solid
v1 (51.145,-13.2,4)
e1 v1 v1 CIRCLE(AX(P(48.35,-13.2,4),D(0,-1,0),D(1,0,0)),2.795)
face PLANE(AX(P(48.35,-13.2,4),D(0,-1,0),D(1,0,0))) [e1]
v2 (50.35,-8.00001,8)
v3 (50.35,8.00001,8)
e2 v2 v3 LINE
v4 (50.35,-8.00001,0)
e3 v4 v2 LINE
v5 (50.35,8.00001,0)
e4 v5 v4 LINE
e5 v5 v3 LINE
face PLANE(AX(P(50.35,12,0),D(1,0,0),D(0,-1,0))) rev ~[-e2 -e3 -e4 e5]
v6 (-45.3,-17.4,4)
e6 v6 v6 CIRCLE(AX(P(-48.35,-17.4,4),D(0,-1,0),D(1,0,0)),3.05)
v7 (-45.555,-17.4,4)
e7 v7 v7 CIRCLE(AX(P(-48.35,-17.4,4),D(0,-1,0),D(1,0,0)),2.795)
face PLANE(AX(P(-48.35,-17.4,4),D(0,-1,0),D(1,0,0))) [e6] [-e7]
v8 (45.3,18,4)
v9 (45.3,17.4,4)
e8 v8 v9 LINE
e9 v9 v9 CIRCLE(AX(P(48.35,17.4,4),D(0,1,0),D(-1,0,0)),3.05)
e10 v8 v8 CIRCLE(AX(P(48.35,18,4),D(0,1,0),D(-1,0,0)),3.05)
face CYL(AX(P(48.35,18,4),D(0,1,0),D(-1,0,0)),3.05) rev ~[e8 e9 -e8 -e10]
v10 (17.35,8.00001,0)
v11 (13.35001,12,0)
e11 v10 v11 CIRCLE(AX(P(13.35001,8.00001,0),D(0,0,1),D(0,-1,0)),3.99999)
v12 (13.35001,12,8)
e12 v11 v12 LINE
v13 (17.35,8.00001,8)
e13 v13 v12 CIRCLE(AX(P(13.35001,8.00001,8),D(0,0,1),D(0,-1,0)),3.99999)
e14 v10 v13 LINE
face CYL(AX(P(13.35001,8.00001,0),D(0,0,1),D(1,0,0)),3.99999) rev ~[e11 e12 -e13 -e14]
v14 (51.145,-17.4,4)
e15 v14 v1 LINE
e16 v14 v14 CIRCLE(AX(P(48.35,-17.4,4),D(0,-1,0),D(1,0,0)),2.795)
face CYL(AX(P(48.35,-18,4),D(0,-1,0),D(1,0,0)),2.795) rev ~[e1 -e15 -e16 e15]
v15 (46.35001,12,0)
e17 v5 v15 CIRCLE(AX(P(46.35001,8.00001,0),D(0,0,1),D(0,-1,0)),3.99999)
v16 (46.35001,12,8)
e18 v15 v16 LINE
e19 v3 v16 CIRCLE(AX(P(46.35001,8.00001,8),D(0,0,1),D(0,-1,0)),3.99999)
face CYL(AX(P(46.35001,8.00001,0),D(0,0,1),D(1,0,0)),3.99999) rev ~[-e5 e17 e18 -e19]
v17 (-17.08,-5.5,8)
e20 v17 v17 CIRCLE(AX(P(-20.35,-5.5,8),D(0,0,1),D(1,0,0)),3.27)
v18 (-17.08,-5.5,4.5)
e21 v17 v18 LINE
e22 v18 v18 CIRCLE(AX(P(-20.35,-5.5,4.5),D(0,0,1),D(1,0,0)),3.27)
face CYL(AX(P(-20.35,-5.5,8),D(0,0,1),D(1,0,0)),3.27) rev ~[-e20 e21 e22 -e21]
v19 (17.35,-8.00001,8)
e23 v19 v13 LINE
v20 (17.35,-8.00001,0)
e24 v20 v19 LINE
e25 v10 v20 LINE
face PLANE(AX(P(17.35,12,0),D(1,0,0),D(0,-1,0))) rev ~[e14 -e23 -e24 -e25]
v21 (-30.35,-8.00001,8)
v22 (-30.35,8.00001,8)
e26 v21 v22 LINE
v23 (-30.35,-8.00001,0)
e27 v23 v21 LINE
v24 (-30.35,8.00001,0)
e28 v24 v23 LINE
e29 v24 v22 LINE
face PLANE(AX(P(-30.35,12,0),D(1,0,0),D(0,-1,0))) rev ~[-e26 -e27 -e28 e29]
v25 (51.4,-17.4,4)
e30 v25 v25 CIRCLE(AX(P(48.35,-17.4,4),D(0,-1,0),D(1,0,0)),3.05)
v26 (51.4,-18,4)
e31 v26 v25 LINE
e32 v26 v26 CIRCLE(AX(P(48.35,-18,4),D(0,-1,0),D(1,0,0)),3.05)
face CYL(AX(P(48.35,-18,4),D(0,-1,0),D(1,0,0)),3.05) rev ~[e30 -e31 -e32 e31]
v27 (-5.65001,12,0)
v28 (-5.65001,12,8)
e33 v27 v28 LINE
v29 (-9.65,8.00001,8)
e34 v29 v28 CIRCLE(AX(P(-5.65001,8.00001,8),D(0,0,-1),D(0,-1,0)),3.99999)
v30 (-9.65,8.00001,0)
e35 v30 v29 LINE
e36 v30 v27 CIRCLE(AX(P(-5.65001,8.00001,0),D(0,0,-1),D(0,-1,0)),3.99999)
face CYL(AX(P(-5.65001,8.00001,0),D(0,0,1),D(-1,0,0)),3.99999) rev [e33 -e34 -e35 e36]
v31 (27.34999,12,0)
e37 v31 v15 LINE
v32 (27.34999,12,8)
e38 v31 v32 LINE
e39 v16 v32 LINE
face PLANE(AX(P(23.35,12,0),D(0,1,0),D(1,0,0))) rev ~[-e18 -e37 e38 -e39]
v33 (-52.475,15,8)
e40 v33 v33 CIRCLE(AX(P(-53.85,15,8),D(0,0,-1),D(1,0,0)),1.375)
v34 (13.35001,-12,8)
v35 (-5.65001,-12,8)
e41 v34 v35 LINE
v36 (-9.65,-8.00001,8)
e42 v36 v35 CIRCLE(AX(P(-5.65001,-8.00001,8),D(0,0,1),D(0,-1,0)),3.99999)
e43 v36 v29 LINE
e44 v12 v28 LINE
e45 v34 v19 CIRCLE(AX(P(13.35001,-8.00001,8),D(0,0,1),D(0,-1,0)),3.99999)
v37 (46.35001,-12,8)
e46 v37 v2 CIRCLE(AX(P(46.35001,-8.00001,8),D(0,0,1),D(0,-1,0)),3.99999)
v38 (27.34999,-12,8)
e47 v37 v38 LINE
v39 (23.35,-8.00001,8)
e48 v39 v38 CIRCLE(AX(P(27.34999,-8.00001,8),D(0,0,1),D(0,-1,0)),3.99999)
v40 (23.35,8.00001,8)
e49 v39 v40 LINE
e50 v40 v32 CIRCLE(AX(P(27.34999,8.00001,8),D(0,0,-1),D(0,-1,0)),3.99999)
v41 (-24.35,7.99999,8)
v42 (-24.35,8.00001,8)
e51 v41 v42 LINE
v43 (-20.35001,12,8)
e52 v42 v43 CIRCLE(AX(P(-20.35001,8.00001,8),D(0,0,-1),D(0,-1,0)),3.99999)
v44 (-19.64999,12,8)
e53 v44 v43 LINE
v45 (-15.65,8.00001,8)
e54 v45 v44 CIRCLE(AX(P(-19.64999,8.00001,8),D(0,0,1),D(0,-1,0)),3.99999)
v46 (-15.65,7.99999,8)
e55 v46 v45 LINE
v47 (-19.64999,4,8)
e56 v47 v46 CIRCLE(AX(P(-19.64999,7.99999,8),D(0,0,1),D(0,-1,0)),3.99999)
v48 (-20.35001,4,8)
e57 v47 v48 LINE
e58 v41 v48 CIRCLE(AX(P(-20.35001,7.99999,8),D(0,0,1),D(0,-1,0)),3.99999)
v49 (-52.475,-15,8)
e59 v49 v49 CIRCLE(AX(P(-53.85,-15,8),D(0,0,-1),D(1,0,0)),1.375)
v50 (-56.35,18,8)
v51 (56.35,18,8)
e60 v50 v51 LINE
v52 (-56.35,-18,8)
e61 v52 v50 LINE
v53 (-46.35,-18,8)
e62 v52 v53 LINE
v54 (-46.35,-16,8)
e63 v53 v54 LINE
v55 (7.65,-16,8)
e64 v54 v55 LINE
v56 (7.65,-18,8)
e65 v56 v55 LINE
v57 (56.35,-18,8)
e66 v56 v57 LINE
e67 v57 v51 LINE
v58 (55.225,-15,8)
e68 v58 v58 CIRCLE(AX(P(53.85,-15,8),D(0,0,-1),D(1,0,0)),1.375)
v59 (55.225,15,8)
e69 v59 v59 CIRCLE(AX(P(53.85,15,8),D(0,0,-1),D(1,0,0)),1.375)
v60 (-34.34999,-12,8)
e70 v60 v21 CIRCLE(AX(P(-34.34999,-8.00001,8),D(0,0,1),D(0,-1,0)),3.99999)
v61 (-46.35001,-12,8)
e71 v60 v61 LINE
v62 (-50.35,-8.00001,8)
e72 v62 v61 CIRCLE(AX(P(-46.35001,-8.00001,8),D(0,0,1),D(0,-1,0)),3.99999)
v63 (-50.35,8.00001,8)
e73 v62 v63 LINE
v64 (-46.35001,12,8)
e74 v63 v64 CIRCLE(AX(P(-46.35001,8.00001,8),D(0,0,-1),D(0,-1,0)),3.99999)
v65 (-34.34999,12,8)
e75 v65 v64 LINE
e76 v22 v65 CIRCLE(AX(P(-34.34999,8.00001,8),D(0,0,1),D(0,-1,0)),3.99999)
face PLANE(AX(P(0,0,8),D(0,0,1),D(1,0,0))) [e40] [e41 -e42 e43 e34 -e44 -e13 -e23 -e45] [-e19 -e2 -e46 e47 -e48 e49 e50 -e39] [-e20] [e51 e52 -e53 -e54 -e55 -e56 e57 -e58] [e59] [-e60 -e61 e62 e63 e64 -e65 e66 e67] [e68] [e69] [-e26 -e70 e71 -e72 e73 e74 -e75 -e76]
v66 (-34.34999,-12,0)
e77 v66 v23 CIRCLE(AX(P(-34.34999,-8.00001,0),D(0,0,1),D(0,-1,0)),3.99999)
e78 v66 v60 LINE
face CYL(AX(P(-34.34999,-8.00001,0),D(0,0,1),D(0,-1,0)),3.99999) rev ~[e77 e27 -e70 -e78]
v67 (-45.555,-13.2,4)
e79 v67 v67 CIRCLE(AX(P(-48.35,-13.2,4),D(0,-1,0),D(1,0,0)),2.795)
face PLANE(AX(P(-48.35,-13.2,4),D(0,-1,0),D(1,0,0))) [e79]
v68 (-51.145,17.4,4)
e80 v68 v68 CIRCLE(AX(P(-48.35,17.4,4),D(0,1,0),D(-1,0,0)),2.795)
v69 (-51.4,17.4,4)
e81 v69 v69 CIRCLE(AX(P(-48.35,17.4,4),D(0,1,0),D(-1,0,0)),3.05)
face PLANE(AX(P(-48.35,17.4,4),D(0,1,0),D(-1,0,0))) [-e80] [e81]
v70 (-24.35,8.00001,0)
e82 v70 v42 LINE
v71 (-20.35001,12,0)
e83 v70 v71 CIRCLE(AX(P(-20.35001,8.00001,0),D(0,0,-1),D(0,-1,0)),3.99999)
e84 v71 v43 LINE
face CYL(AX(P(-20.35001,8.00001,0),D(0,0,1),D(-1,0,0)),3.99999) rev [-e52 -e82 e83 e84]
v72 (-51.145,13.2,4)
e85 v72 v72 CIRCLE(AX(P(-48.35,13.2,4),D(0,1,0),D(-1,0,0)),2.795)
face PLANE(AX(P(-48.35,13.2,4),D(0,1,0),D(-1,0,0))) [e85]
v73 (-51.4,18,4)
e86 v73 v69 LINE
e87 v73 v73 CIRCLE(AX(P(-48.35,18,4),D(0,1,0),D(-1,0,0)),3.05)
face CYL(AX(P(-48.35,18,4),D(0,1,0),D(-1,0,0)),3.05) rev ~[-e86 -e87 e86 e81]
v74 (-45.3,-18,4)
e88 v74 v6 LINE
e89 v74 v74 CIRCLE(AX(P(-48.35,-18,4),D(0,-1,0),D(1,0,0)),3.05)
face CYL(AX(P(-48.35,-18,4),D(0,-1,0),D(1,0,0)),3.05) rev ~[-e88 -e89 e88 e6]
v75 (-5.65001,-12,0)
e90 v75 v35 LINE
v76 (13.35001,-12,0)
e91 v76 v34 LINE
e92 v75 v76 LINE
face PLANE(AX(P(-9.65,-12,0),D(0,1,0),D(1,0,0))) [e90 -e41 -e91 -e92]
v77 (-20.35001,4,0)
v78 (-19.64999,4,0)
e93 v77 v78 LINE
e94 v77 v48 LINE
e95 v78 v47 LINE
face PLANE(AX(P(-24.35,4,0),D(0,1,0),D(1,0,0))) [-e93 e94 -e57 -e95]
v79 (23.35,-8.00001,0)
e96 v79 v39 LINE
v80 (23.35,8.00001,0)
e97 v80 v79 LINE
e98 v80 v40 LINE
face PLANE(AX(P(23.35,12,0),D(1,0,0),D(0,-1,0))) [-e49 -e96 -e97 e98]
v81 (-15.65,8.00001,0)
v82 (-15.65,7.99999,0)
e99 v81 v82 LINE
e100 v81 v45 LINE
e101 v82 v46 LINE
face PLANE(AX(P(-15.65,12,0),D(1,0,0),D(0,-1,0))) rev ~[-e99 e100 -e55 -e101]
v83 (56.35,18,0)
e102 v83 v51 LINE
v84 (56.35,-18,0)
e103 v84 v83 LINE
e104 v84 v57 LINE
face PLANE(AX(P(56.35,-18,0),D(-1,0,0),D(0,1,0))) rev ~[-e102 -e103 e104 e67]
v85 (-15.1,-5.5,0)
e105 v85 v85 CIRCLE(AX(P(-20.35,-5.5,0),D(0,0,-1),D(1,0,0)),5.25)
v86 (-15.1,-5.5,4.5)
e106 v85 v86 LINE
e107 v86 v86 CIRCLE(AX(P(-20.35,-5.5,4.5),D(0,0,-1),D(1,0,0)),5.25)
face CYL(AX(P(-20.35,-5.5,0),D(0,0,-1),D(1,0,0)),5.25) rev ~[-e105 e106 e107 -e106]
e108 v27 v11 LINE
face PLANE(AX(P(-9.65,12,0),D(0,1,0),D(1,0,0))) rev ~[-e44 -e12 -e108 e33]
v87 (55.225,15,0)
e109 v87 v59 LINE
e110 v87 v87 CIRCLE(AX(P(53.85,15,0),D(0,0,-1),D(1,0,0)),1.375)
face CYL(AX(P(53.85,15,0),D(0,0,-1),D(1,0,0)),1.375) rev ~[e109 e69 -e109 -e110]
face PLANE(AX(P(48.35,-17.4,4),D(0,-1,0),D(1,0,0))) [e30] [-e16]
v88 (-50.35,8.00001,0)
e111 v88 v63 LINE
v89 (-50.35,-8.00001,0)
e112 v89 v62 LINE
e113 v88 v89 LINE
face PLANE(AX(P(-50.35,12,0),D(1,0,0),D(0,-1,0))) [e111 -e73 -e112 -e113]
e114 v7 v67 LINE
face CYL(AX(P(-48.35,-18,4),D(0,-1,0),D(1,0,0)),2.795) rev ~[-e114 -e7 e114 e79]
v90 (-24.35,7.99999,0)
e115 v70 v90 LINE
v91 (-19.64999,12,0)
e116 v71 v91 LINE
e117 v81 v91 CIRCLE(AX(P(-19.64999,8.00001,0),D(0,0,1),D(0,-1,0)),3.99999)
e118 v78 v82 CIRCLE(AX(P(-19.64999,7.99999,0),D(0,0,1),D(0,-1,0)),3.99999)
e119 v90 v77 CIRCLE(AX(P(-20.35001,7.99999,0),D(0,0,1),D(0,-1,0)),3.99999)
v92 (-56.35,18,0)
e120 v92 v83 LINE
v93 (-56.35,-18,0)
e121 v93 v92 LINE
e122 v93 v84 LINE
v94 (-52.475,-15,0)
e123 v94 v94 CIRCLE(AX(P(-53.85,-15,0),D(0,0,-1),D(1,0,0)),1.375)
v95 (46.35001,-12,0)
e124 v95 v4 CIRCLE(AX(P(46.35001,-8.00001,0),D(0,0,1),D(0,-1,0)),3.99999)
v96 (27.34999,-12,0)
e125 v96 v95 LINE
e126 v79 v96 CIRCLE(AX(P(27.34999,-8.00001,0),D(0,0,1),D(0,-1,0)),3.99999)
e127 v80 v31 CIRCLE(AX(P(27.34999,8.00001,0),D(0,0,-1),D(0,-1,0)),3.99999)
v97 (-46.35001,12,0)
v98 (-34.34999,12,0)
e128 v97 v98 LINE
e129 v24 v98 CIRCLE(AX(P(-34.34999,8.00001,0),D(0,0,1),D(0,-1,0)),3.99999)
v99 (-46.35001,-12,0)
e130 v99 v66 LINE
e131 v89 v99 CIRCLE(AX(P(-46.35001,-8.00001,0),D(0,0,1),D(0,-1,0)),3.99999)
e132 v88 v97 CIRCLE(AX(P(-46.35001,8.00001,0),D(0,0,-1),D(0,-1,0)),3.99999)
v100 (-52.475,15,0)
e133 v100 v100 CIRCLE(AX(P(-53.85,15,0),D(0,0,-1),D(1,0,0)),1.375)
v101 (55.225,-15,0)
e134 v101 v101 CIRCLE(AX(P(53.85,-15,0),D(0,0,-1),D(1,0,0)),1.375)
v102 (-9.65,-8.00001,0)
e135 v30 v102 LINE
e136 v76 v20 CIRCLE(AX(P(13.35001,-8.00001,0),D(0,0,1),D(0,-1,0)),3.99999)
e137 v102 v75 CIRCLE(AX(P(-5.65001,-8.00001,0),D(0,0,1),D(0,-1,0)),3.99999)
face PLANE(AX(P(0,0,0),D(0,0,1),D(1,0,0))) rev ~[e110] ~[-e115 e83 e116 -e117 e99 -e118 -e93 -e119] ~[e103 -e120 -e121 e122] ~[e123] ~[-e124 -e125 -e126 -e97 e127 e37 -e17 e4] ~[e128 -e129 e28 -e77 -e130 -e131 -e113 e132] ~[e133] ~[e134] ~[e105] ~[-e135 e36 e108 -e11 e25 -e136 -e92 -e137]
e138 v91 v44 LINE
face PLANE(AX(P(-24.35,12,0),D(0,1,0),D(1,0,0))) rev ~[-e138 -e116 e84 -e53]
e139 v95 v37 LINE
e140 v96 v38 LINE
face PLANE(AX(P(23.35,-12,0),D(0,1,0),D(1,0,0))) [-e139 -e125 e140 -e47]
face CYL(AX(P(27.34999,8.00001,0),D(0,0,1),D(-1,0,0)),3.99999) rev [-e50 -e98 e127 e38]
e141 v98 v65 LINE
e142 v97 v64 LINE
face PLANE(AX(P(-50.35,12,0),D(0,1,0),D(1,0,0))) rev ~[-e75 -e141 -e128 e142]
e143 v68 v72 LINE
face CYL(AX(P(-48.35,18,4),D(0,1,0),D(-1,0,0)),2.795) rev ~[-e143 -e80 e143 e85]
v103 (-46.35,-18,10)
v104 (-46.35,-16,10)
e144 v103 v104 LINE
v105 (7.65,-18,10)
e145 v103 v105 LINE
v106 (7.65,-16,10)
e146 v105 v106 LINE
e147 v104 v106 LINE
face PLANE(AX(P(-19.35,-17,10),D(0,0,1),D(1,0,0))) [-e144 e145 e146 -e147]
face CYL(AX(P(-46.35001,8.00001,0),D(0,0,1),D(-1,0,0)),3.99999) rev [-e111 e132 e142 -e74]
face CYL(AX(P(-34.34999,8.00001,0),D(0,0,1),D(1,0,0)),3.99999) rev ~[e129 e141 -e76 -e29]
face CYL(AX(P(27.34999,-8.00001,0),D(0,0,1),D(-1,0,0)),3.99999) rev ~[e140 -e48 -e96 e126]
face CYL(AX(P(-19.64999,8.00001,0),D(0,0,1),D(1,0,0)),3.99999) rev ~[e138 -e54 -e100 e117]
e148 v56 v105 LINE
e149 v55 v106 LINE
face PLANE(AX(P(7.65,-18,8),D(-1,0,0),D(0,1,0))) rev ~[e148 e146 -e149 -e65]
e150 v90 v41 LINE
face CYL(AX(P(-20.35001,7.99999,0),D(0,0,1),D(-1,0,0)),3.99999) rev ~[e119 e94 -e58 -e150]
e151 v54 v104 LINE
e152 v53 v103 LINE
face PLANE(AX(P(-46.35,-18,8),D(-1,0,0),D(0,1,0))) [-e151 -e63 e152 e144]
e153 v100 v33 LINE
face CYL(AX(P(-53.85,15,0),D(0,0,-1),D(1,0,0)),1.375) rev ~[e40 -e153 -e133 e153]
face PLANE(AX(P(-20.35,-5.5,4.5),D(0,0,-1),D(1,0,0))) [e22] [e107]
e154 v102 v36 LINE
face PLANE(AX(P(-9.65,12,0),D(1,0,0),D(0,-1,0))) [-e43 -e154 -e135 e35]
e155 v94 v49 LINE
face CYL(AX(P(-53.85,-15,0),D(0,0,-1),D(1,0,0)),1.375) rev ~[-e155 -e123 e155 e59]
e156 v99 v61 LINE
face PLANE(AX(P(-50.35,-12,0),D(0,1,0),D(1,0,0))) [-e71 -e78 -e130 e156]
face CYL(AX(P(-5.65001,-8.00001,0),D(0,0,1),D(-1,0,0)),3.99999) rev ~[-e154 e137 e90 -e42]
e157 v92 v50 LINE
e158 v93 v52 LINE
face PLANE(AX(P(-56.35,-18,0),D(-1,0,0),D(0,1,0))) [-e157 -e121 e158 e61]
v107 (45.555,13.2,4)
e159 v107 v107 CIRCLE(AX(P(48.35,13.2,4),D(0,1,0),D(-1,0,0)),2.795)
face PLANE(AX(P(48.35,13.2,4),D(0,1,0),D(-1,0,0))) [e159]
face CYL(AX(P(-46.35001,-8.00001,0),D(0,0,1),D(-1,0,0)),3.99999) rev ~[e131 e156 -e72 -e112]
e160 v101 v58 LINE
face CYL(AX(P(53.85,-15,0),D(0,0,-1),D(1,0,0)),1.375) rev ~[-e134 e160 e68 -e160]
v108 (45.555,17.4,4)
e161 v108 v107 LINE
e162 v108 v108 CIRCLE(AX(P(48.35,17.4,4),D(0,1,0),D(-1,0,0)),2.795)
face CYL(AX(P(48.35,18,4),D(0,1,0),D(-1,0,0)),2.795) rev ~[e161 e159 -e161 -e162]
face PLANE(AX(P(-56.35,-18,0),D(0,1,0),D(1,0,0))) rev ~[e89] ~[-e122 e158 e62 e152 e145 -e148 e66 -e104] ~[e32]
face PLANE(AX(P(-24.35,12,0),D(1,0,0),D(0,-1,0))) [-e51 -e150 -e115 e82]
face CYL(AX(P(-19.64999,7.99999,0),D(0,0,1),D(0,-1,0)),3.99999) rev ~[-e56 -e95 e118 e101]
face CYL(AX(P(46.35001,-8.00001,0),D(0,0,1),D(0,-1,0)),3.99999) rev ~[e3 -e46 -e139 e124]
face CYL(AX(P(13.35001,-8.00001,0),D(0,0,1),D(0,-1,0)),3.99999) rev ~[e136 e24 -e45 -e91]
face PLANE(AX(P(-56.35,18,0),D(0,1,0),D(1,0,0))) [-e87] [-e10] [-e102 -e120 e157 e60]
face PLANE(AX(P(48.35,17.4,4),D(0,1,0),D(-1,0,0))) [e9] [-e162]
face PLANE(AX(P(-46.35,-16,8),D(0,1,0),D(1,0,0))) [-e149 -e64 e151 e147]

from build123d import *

# Parameters (mm, degrees)
F0_W      = 112.7
F0_H      = 36
F1_DEPTH  = 8
F3_W      = 54
F3_H      = 2
F4_DEPTH  = 2
F5_R      = 3.27
F6_DEPTH  = 8.001
F7_R      = 1.375
F8_DEPTH  = 10.001
F10_R     = 5.25
F11_DEPTH = 4.5
F9_W      = 20
F9_H      = 24
F9_W_2    = 27
F9_W_3    = 8.7
F9_H_2    = 8
F12_DEPTH = 10.001
F13_R     = 3.99999
F14_R     = 2.795
F15_DEPTH = 4.8
F16_R     = 2.795
F17_DEPTH = 4.8
F18_R     = 3.05
F19_DEPTH = 0.6
F20_R     = 3.05
F21_DEPTH = 0.6


# Not quite as in the source:
# - a fillet or chamfer is up to 0.001 mm smaller than in the source, because OpenCascade refuses the exact size


with BuildPart() as f1:
    # F0 (on Top) → F1 (new body)
    with BuildSketch(Plane.XY):
        Rectangle(F0_W, F0_H)
    extrude(amount=F1_DEPTH)

    # F3 (on face) → F4 (join)
    with BuildSketch(Plane.XY.offset(8)):
        with Locations((-19.35, -17)):
            Rectangle(F3_W, F3_H)
    extrude(amount=F4_DEPTH)

    # F5 (on face) → F6 (cut, through all)
    with BuildSketch(Plane.XY.offset(8)):
        with Locations((-20.35, -5.5)):
            Circle(F5_R)
    extrude(amount=-F6_DEPTH, mode=Mode.SUBTRACT)

    # F7 (on face) → F8 (cut, through all)
    with BuildSketch(Plane(origin=(0, 0, 0), x_dir=(1, 0, 0), z_dir=(0, 0, -1))):
        with Locations((-53.85, 15)):
            Circle(F7_R)
        with Locations((-53.85, -15)):
            Circle(F7_R)
        with Locations((53.85, 15)):
            Circle(F7_R)
        with Locations((53.85, -15)):
            Circle(F7_R)
    extrude(amount=-F8_DEPTH, mode=Mode.SUBTRACT)

    # F10 (on face) → F11 (cut)
    with BuildSketch(Plane(origin=(0, 0, 0), x_dir=(1, 0, 0), z_dir=(0, 0, -1))):
        with Locations((-20.35, 5.5)):
            Circle(F10_R)
    extrude(amount=-F11_DEPTH, mode=Mode.SUBTRACT)

    # F9 (on face) → F12 (cut, through all)
    with BuildSketch(Plane(origin=(0, 0, 0), x_dir=(1, 0, 0), z_dir=(0, 0, -1))):
        with Locations((-40.35, 0)):
            Rectangle(F9_W, F9_H)
        with Locations((3.85, 0)):
            Rectangle(F9_W_2, F9_H)
        with Locations((36.85, 0)):
            Rectangle(F9_W_2, F9_H)
        with Locations((-20, -8)):
            Rectangle(F9_W_3, F9_H_2)
    extrude(amount=-F12_DEPTH, mode=Mode.SUBTRACT)

    # F13 (radius 4 in the source; OpenCascade refuses exactly that, so slightly less here)
    f13_edges = [f1.edges().sort_by_distance(p)[0] for p in [
        (-30.35, -12, 4),
        (-50.35, -12, 4),
        (-50.35, 12, 4),
        (-30.35, 12, 4),
        (-24.35, 4, 4),
        (-9.65, -12, 4),
        (23.35, -12, 4),
        (-9.65, 12, 4),
        (-24.35, 12, 4),
        (17.35, -12, 4),
        (50.35, -12, 4),
        (50.35, 12, 4),
        (23.35, 12, 4),
        (-15.65, 4, 4),
        (-15.65, 12, 4),
        (17.35, 12, 4),
    ]]
    fillet(f13_edges, radius=F13_R)

    # F14 (on face) → F15 (cut)
    with BuildSketch(Plane.XZ.offset(18)):
        with Locations((48.35, 4)):
            Circle(F14_R)
        with Locations((-48.35, 4)):
            Circle(F14_R)
    extrude(amount=-F15_DEPTH, mode=Mode.SUBTRACT)

    # F16 (on face) → F17 (cut)
    with BuildSketch(Plane(origin=(0, 18, 0), x_dir=(-1, 0, 0), z_dir=(0, 1, 0))):
        with Locations((48.35, 4)):
            Circle(F16_R)
        with Locations((-48.35, 4)):
            Circle(F16_R)
    extrude(amount=-F17_DEPTH, mode=Mode.SUBTRACT)

    # F18 (on face) → F19 (cut)
    with BuildSketch(Plane.XZ.offset(18)):
        with Locations((-48.35, 4)):
            Circle(F18_R)
        with Locations((48.35, 4)):
            Circle(F18_R)
    extrude(amount=-F19_DEPTH, mode=Mode.SUBTRACT)

    # F20 (on face) → F21 (cut)
    with BuildSketch(Plane(origin=(0, 18, 0), x_dir=(-1, 0, 0), z_dir=(0, 1, 0))):
        with Locations((-48.35, 4)):
            Circle(F20_R)
        with Locations((48.35, 4)):
            Circle(F20_R)
    extrude(amount=-F21_DEPTH, mode=Mode.SUBTRACT)


solid = f1.part
